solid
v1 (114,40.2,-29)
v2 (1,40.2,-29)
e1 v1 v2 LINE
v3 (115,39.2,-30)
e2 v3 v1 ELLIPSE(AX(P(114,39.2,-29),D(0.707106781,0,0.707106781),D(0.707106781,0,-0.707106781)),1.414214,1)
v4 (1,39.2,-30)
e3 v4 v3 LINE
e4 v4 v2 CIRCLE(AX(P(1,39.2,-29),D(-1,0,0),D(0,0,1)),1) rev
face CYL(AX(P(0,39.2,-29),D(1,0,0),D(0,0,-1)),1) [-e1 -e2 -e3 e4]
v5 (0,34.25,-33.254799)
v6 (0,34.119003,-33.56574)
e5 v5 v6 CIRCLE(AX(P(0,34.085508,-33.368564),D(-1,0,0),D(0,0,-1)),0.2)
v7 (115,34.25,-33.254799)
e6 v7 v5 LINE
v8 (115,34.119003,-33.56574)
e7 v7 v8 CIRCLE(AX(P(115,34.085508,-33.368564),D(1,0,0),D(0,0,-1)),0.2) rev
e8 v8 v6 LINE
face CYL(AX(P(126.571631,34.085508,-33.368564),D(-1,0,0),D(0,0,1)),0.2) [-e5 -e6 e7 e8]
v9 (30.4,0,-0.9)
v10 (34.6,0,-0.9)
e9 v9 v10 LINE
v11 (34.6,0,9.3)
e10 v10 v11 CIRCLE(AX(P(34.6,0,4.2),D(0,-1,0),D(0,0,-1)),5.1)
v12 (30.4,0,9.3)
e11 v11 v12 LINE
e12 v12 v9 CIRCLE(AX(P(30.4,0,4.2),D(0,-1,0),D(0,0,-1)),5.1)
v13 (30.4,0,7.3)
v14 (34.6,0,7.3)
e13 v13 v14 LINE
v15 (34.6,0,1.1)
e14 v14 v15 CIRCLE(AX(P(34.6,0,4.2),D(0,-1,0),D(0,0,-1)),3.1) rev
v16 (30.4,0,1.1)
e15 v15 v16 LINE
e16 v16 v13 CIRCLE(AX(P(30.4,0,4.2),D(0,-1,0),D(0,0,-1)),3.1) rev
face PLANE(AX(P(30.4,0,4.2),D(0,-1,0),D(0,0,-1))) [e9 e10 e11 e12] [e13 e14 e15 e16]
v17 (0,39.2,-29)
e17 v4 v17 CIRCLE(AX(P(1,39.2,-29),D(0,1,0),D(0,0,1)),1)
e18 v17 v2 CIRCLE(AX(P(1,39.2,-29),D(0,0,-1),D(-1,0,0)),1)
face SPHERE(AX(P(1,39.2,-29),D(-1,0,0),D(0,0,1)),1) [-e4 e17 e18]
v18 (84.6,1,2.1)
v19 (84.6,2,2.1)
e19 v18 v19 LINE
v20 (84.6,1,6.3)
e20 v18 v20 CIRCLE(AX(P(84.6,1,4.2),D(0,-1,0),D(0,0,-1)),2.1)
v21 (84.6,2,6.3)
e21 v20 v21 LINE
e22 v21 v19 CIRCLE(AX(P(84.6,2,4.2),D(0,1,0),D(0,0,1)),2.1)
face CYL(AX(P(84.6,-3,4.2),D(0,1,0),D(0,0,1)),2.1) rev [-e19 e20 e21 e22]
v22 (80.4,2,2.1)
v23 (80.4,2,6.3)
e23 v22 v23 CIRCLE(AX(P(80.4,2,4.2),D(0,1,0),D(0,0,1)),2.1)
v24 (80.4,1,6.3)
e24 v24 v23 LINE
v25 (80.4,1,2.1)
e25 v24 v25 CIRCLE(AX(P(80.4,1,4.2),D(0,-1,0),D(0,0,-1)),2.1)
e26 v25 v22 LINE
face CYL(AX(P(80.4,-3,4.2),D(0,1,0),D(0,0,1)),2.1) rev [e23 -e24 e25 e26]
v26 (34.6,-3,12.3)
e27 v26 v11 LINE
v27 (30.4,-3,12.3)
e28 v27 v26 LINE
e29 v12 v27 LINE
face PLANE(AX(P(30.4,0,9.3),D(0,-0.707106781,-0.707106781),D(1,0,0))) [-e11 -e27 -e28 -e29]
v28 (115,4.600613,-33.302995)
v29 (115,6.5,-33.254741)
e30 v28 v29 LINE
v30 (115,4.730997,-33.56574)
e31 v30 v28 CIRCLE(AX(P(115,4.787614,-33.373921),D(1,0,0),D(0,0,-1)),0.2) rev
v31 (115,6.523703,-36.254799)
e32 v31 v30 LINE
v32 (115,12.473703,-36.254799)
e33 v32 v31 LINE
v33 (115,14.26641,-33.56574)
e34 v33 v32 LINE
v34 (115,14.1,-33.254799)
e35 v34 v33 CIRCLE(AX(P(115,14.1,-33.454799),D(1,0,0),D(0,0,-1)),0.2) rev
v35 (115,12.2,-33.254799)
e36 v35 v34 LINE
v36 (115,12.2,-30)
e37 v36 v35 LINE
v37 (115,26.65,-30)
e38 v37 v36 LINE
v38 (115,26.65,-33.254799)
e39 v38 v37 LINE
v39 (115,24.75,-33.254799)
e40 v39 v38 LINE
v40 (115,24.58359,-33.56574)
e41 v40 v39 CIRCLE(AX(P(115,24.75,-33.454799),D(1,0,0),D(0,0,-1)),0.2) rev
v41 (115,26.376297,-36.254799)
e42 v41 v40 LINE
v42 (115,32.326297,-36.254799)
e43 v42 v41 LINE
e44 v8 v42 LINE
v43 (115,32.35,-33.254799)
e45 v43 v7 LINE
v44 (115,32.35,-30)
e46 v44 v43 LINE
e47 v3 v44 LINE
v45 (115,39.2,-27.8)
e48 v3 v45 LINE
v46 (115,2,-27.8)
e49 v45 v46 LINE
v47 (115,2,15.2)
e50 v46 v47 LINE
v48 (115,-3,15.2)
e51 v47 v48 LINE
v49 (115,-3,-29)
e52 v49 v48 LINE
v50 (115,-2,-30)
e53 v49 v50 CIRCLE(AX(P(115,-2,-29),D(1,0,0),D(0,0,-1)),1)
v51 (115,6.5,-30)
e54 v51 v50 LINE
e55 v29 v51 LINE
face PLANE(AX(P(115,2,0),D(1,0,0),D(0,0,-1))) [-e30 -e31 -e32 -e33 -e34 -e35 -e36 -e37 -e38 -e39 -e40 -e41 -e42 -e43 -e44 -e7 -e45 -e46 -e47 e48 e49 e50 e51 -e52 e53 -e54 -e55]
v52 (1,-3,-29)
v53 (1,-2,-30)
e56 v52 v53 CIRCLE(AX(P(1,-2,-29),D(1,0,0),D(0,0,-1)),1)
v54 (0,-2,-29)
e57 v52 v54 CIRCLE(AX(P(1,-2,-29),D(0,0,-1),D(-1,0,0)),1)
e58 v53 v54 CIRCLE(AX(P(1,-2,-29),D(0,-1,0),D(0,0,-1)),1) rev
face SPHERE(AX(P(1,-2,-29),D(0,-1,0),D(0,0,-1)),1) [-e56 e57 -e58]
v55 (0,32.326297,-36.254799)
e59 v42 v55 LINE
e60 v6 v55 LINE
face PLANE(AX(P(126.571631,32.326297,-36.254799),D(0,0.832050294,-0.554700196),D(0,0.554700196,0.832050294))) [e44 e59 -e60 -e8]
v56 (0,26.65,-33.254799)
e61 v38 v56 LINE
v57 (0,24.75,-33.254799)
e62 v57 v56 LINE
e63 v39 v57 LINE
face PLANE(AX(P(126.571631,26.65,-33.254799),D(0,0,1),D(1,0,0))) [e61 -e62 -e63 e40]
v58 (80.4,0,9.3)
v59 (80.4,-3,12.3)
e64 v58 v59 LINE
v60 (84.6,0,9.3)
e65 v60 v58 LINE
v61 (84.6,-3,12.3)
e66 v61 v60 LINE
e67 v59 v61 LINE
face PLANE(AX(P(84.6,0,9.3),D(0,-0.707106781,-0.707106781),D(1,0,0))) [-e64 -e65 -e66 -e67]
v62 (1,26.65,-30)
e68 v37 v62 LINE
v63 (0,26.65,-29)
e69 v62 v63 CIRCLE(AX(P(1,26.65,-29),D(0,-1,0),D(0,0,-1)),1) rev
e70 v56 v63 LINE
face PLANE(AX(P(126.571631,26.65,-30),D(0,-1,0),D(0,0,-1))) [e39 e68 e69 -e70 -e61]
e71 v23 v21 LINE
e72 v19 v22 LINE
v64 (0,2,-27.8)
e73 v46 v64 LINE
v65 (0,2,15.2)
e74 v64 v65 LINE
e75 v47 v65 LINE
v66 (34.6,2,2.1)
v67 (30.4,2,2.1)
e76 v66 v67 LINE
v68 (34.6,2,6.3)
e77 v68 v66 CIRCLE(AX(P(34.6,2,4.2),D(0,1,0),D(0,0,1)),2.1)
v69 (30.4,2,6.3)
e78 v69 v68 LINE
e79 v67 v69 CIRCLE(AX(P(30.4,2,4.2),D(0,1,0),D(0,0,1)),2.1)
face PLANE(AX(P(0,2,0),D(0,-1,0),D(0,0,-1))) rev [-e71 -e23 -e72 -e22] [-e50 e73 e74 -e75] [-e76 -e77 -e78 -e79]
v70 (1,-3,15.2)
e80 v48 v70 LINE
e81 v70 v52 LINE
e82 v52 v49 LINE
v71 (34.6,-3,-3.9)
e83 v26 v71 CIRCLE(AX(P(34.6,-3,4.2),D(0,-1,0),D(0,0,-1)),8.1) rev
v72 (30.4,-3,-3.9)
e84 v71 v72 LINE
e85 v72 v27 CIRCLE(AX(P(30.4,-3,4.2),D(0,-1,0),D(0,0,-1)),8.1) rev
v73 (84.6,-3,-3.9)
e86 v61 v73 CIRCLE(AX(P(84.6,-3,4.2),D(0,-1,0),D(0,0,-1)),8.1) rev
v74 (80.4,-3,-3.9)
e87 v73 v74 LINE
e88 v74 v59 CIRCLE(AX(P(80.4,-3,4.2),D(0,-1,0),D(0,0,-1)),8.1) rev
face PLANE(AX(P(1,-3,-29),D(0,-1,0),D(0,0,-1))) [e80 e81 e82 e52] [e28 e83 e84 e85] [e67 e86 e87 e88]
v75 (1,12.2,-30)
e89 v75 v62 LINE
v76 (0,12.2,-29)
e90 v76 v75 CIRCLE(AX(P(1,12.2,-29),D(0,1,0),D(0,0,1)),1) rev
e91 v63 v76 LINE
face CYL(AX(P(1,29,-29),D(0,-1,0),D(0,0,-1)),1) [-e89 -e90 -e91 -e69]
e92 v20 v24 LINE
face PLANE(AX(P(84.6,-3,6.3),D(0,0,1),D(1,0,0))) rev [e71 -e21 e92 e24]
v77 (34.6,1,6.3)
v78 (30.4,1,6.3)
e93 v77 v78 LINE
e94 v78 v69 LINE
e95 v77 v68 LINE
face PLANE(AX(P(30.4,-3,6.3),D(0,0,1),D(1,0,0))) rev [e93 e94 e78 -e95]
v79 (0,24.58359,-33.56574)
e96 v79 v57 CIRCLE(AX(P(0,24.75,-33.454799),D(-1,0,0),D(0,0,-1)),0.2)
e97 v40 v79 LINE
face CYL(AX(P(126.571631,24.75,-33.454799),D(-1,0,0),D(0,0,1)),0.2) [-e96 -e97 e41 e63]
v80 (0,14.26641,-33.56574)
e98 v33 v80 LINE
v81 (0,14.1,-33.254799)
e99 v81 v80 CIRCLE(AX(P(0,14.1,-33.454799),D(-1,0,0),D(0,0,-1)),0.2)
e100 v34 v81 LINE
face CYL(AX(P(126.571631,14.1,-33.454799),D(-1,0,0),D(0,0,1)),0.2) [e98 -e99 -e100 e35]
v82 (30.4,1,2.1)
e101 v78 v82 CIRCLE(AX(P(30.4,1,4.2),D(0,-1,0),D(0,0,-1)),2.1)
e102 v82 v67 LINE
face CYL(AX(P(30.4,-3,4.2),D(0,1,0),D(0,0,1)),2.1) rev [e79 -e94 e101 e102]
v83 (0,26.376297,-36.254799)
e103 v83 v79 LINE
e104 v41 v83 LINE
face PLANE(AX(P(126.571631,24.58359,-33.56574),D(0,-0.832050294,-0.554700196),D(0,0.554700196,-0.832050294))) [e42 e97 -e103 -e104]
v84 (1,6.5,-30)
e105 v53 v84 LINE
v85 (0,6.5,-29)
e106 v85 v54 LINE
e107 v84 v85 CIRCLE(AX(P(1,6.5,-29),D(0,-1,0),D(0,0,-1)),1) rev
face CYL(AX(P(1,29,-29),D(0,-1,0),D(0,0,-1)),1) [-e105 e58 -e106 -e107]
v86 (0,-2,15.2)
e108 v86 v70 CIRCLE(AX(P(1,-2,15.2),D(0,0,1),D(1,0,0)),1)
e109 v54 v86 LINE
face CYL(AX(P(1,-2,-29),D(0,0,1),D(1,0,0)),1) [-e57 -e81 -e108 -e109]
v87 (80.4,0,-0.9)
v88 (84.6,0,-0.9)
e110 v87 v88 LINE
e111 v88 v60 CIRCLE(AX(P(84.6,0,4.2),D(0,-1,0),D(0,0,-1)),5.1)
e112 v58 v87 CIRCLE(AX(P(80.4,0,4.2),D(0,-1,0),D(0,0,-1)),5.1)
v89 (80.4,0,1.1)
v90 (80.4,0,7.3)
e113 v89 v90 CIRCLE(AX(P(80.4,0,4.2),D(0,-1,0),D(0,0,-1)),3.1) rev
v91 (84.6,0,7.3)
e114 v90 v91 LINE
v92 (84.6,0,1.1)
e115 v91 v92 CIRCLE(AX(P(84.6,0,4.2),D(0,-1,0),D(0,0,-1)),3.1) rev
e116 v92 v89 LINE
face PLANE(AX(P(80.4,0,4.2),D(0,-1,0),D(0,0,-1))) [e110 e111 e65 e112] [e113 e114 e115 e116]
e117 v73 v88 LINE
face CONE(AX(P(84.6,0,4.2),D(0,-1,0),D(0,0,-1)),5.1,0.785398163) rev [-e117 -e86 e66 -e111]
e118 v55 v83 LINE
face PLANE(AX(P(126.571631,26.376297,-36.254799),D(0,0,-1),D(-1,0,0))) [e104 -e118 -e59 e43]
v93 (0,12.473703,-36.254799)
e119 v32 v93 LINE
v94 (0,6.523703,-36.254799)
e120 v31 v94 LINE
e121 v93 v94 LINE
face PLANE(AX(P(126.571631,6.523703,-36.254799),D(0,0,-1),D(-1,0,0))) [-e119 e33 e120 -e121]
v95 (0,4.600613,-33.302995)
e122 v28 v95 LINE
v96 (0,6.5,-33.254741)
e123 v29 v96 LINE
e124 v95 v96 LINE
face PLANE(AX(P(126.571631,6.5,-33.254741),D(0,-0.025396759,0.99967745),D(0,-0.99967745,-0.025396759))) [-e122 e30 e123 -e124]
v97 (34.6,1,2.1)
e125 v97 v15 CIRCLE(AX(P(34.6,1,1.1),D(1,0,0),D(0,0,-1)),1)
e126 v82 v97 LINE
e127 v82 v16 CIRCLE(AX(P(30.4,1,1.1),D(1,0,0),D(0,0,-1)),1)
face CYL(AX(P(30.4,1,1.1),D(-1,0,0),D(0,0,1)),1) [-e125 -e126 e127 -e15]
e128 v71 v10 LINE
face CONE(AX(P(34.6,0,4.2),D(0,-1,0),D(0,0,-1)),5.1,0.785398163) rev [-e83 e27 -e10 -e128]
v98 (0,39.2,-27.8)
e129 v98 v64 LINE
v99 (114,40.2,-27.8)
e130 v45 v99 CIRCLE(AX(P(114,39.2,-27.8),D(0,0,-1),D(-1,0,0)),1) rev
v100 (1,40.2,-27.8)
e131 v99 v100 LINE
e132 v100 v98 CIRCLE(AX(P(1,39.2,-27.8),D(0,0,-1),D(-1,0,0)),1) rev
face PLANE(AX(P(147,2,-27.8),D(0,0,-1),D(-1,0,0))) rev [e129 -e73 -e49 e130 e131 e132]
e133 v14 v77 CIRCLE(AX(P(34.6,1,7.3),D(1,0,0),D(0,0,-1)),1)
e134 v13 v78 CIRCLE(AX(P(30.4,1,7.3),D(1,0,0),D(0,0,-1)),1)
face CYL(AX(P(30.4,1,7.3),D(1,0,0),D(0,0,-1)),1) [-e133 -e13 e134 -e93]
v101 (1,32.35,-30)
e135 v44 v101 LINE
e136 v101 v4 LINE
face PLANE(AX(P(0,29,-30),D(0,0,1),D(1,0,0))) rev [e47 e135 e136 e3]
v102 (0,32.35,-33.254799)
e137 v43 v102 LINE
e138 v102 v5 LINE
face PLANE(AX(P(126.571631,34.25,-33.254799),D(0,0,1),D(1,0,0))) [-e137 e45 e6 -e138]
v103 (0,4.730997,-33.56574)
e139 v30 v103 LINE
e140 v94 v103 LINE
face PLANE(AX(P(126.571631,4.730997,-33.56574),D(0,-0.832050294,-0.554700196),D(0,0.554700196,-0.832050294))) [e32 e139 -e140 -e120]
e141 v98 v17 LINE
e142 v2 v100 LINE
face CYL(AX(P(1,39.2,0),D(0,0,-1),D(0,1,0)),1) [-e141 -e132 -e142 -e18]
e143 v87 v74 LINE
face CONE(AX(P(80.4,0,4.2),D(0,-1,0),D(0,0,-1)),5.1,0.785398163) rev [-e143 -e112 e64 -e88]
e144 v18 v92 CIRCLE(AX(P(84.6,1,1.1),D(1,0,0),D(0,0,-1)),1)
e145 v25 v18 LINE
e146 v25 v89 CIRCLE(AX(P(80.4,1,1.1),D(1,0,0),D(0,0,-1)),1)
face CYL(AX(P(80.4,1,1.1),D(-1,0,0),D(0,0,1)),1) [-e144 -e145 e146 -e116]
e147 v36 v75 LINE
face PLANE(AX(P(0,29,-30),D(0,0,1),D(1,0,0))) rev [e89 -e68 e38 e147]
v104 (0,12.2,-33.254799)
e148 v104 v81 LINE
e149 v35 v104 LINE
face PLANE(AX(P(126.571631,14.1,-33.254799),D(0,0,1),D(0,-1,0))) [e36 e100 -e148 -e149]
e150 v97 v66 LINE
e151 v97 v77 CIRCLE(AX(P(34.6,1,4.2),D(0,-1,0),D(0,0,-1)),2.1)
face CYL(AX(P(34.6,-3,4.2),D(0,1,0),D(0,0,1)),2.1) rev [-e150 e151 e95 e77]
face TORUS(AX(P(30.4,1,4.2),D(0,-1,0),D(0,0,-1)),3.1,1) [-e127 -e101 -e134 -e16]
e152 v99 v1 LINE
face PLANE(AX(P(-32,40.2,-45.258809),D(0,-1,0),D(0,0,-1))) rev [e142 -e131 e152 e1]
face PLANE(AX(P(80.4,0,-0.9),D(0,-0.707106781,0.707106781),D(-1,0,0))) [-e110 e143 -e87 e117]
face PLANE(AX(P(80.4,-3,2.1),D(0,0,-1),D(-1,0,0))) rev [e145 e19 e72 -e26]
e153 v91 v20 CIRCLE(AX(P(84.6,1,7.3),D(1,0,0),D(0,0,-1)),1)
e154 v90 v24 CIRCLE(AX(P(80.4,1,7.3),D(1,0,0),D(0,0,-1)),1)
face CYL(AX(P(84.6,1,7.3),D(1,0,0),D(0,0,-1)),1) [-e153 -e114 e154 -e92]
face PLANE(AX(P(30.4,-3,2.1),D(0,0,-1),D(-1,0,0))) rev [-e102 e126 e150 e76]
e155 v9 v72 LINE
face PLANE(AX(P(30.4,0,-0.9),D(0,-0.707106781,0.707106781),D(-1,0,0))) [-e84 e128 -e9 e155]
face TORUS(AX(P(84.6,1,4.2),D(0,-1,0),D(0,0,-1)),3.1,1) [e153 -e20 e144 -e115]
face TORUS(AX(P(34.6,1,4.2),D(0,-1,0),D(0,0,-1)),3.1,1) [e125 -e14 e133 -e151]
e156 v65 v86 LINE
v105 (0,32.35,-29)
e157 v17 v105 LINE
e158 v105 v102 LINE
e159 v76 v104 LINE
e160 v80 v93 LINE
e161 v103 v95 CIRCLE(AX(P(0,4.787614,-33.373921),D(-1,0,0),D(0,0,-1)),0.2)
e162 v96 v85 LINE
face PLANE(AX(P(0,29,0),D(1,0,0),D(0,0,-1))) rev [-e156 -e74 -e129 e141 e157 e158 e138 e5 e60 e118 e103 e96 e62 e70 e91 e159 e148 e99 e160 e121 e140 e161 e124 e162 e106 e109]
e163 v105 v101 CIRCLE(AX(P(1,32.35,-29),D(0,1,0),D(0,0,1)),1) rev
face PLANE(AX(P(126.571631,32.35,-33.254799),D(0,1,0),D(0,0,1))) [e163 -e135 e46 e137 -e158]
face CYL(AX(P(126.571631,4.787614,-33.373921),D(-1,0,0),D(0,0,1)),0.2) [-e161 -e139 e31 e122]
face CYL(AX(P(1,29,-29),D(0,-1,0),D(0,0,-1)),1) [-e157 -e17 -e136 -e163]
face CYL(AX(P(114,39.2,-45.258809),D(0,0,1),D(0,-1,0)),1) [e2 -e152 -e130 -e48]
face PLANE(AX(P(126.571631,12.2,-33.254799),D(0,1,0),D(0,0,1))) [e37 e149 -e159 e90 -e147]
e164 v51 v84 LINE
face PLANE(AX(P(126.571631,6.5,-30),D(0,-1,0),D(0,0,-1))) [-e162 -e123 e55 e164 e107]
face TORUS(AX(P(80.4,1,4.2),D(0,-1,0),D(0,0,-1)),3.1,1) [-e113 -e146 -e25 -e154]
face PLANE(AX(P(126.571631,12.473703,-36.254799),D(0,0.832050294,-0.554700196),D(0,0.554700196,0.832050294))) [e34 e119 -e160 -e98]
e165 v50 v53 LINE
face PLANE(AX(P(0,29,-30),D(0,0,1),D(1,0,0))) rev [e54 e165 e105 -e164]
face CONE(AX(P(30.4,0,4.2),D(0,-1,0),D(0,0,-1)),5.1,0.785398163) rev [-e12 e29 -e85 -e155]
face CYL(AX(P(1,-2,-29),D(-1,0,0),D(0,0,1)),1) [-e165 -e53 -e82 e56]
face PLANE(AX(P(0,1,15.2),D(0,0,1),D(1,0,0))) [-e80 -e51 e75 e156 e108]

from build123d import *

# Parameters (mm, degrees)
SKETCH_1_W               = 115
SKETCH_1_H               = 30
EXTRUDE_1_DEPTH          = 29
SHELL_1_T                = -2
SKETCH_4_W               = 55
SKETCH_4_H               = 63
EXTRUDE_2_DEPTH          = 2
SKETCH_7_W               = 28
SKETCH_7_H               = 49
CUT_EXTRUDE_2_DEPTH      = 28
EXTRUDE_6_DEPTH          = 29
EXTRUDE_8_DEPTH          = 2
EXTRUDE_9_DEPTH          = 115
FILLET_1_R               = 1
SKETCH_8_R               = 1.2
CUT_EXTRUDE_5_DEPTH      = 10
SKETCH_15_W              = 113
SKETCH_15_H              = 39.979543783
CUT_EXTRUDE_6_DEPTH      = 33
CUT_EXTRUDE_7_REACH      = 152.193
SKETCH_16_W              = 16.4
SKETCH_16_H              = 9.3
SKETCH_17_W              = 40.5
SKETCH_17_H              = 2
EXTRUDE_10_DEPTH         = 113
CUT_EXTRUDE_8_DEPTH      = 147
CUT_EXTRUDE_9_DEPTH      = 147
CUT_EXTRUDE_9_DEPTH_BACK = 147
SKETCH_21_W              = 20.17617045
SKETCH_21_H              = 57.30071962
SKETCH_22_W              = 2
SKETCH_22_H              = 5
CUT_EXTRUDE_11_DEPTH     = 0.2
SKETCH_24_W              = 113
SKETCH_24_H              = 56
EXTRUDE_16_DEPTH         = 0.2
CUT_EXTRUDE_12_DEPTH     = 147
CUT_EXTRUDE_13_DEPTH     = 5
FILLET_8_R               = 1
EXTRUDE_17_DEPTH         = 3
EXTRUDE_17_DEPTH_BACK    = 1
FILLET_10_R              = 1
SKETCH_28_W              = 115
SKETCH_28_H              = 5
EXTRUDE_18_DEPTH         = 1
CUT_EXTRUDE_START        = -3
CUT_EXTRUDE_14_DEPTH     = 3
CHAMFER_7_SIZE           = 3
FILLET_11_R              = 1


with BuildPart() as part:
    # Эскиз1 → Бобышка-Вытянуть1 (new body)
    with BuildSketch(Plane(origin=(0, 0, 0), x_dir=(1, 0, 0), z_dir=(0, 1, 0))):
        with Locations((57.5, 15)):
            Rectangle(SKETCH_1_W, SKETCH_1_H)
    extrude(amount=EXTRUDE_1_DEPTH)

    # Оболочка1
    shell_1_openings = [part.faces().sort_by_distance(p)[0] for p in [
        (57.5, 14.5, 0),
    ]]
    offset(amount=SHELL_1_T, openings=shell_1_openings, kind=Kind.INTERSECTION)

    # Эскиз4 → Бобышка-Вытянуть2 (add)
    with BuildSketch(Plane(origin=(115, 0, 0), x_dir=(0, 0, -1), z_dir=(1, 0, 0))):
        with Locations((15, 31.5)):
            Rectangle(SKETCH_4_W, SKETCH_4_H)
    extrude(amount=EXTRUDE_2_DEPTH)

    # Эскиз7 → Вырез-Вытянуть2 (cut)
    with BuildSketch(Plane(origin=(117, 0, 0), x_dir=(0, 0, -1), z_dir=(1, 0, 0))):
        with Locations((14, 31.5)):
            Rectangle(SKETCH_7_W, SKETCH_7_H)
    extrude(amount=-CUT_EXTRUDE_2_DEPTH, mode=Mode.SUBTRACT)

    # Эскиз10 → Бобышка-Вытянуть6 (add)
    with BuildSketch(Plane(origin=(0, 29, 0), x_dir=(1, 0, 0), z_dir=(0, 1, 0))):
        Polygon((115, 30), (115, 28), (89, 28), (2, 28), (2, 0), (0, 0), (0, 28), (0, 30), (87, 30), align=None)
    extrude(amount=EXTRUDE_6_DEPTH)

    # Эскиз13 → Бобышка-Вытянуть8 (add)
    with BuildSketch(Plane.XZ):
        Polygon((115, 12.5), (115, 40), (0, 40), (0, 0), (115, 0), align=None)
        with BuildLine():
            ThreePointArc((34.6, 31.75), (36.7, 33.85), (34.6, 35.95))
            Line((34.6, 35.95), (30.4, 35.95))
            ThreePointArc((30.4, 35.95), (28.3, 33.85), (30.4, 31.75))
            Line((30.4, 31.75), (34.6, 31.75))
        make_face(mode=Mode.SUBTRACT)
        with BuildLine():
            ThreePointArc((80.4, 35.95), (78.3, 33.85), (80.4, 31.75))
            Line((80.4, 31.75), (84.6, 31.75))
            ThreePointArc((84.6, 31.75), (86.7, 33.85), (84.6, 35.95))
            Line((84.6, 35.95), (80.4, 35.95))
        make_face(mode=Mode.SUBTRACT)
    extrude(amount=-EXTRUDE_8_DEPTH)

    # Эскиз14 → Бобышка-Вытянуть9 (add)
    with BuildSketch(Plane.ZY):
        with BuildLine():
            Line((-33.254799468, 26.65), (-33.254799468, 24.75))
            ThreePointArc((-33.254799468, 24.75), (-33.360427883, 24.57366508), (-33.565739508, 24.583589941))
            Line((-33.565739508, 24.583589941), (-36.254799468, 26.376296582))
            Line((-36.254799468, 26.376296582), (-36.254799468, 32.326296582))
            Line((-36.254799468, 32.326296582), (-33.565739508, 34.119003222))
            ThreePointArc((-33.565739508, 34.119003222), (-33.446213245, 34.269819382), (-33.254799468, 34.25))
            Line((-33.254799468, 34.25), (-33.254799468, 32.35))
            Line((-33.254799468, 32.35), (-30, 32.35))
            Line((-30, 32.35), (-30, 26.65))
            Line((-30, 26.65), (-33.254799468, 26.65))
        make_face()
        with BuildLine():
            Line((-33.254741117, 6.5), (-33.302994959, 4.600612844))
            ThreePointArc((-33.302994959, 4.600612844), (-33.462823881, 4.6084601), (-33.565739508, 4.730996778))
            Line((-33.565739508, 4.730996778), (-36.254799468, 6.523703418))
            Line((-36.254799468, 6.523703418), (-36.254799468, 12.473703418))
            Line((-36.254799468, 12.473703418), (-33.565739508, 14.266410059))
            ThreePointArc((-33.565739508, 14.266410059), (-33.360427883, 14.27633492), (-33.254799468, 14.1))
            Line((-33.254799468, 14.1), (-33.254799468, 12.2))
            Line((-33.254799468, 12.2), (-30, 12.2))
            Line((-30, 12.2), (-30, 6.5))
            Line((-30, 6.5), (-33.254741117, 6.5))
        make_face()
    extrude(amount=-EXTRUDE_9_DEPTH)

    # Скругление1
    fillet_1_edges = [part.edges().sort_by_distance(p)[0] for p in [
        (32.5, 0, 35.95),
        (82.5, 0, 35.95),
        (82.5, 0, 31.75),
        (78.3, 0, 33.85),
        (86.7, 0, 33.85),
        (36.7, 0, 33.85),
        (28.3, 0, 33.85),
        (32.5, 0, 31.75),
    ]]
    fillet(fillet_1_edges, radius=FILLET_1_R)

    # Эскиз8 → Вырез-Вытянуть5 (cut)
    with BuildSketch(Plane(origin=(117, 0, 0), x_dir=(0, 0, -1), z_dir=(1, 0, 0))):
        with Locations((-5.5, 31.5)):
            Circle(SKETCH_8_R)
    extrude(amount=-CUT_EXTRUDE_5_DEPTH, mode=Mode.SUBTRACT)

    # Эскиз15 → Вырез-Вытянуть6 (cut)
    with BuildSketch(Plane.XY.offset(-28)):
        with Locations((58.5, 46.989771892)):
            Rectangle(SKETCH_15_W, SKETCH_15_H)
    extrude(amount=CUT_EXTRUDE_6_DEPTH, mode=Mode.SUBTRACT)

    # Эскиз16 → Вырез-Вытянуть7 (cut, up to next)
    with BuildSketch(Plane(origin=(0, 0, -30), x_dir=(-1, 0, 0), z_dir=(0, 0, -1)), mode=Mode.PRIVATE) as cut_extrude_7_sk1:
        with Locations((-53.2, 49.65)):
            Rectangle(SKETCH_16_W, SKETCH_16_H)
    cut_extrude_7_tool1 = extrude(cut_extrude_7_sk1.sketch, amount=-CUT_EXTRUDE_7_REACH, mode=Mode.PRIVATE) & part.part
    add(cut_extrude_7_tool1.solids().sort_by_distance((53.2, 49.65, -30))[0], mode=Mode.SUBTRACT)

    # Эскиз17 → Бобышка-Вытянуть10 (add)
    with BuildSketch(Plane.ZY.offset(-115)):
        with Locations((-7.75, 57)):
            Rectangle(SKETCH_17_W, SKETCH_17_H)
    extrude(amount=EXTRUDE_10_DEPTH)

    # Эскиз20 → Вырез-Вытянуть8 (cut)
    with BuildSketch(Plane.ZY):
        Polygon((0, 2), (-27.8, 2), (-27.8, 71.965307459), (29.159484087, 71.965307459), (29.159484087, 2), align=None)
    extrude(amount=-CUT_EXTRUDE_8_DEPTH, mode=Mode.SUBTRACT)

    # Эскиз21 → Вырез-Вытянуть9 (cut, two sides: drawn at the far end of the back side and taken through both)
    with BuildSketch(Plane(origin=(0, 2, 0), x_dir=(1, 0, 0), z_dir=(0, 1, 0)).offset(-CUT_EXTRUDE_9_DEPTH_BACK)):
        with Locations((125.088085225, 16.15035981)):
            Rectangle(SKETCH_21_W, SKETCH_21_H)
    extrude(amount=CUT_EXTRUDE_9_DEPTH + CUT_EXTRUDE_9_DEPTH_BACK, mode=Mode.SUBTRACT)

    # Эскиз22 → Вырез-Вытянуть11 (cut)
    with BuildSketch(Plane.XY.offset(-28)):
        with Locations((114, 4.5)):
            Rectangle(SKETCH_22_W, SKETCH_22_H)
    extrude(amount=CUT_EXTRUDE_11_DEPTH, mode=Mode.SUBTRACT)

    # Эскиз24 → Бобышка-Вытянуть16 (add)
    with BuildSketch(Plane.XY.offset(-27.8)):
        with Locations((58.5, 28)):
            Rectangle(SKETCH_24_W, SKETCH_24_H)
    extrude(amount=-EXTRUDE_16_DEPTH)

    # Эскиз25 → Вырез-Вытянуть12 (cut)
    with BuildSketch(Plane(origin=(115, 0, 0), x_dir=(0, 0, -1), z_dir=(1, 0, 0))):
        Polygon((-61.35646419, 61.721146041), (45.258808631, 61.721146041), (45.258808631, 40.2), (-10.2, 40.2), (-10.2, -7.989940419), (-61.35646419, -7.989940419), (-61.35646419, 40.2), align=None)
    extrude(amount=-CUT_EXTRUDE_12_DEPTH, mode=Mode.SUBTRACT)

    # Эскиз26 → Вырез-Вытянуть13 (cut)
    with BuildSketch(Plane(origin=(0, 2, 0), x_dir=(1, 0, 0), z_dir=(0, 1, 0))):
        with BuildLine():
            Line((30.4, -2.1), (34.6, -2.1))
            ThreePointArc((34.6, -2.1), (36.7, -4.2), (34.6, -6.3))
            Line((34.6, -6.3), (30.4, -6.3))
            ThreePointArc((30.4, -6.3), (28.3, -4.2), (30.4, -2.1))
        make_face()
        with BuildLine():
            Line((80.4, -2.1), (84.6, -2.1))
            ThreePointArc((84.6, -2.1), (86.7, -4.2), (84.6, -6.3))
            Line((84.6, -6.3), (80.4, -6.3))
            ThreePointArc((80.4, -6.3), (78.3, -4.2), (80.4, -2.1))
        make_face()
    extrude(amount=-CUT_EXTRUDE_13_DEPTH, mode=Mode.SUBTRACT)

    # Скругление8
    fillet_8_edges = [part.edges().sort_by_distance(p)[0] for p in [
        (0, 3.25, -30),
        (0, 19.425, -30),
        (0, 36.275, -30),
        (0, 40.2, -28.9),
        (57.5, 40.2, -30),
        (115, 40.2, -28.9),
        (57.5, 0, 10.2),
        (57.5, 0, -30),
        (0, 0, -9.9),
    ]]
    fillet(fillet_8_edges, radius=FILLET_8_R)

    # Эскиз27 → Бобышка-Вытянуть17 (add, two sides: drawn at the far end of the back side and taken through both)
    with BuildSketch(Plane.XZ.offset(-EXTRUDE_17_DEPTH_BACK)):
        with BuildLine():
            Line((115, -30), (115, -29))
            Line((115, -29), (115, 9.2))
            Line((115, 9.2), (115, 10.2))
            Line((115, 10.2), (115, 15.2))
            Line((115, 15.2), (0, 15.2))
            Line((0, 15.2), (0, 10.2))
            Line((0, 10.2), (0, -29))
            ThreePointArc((0, -29), (0.292893219, -29.707106781), (1, -30))
            Line((1, -30), (115, -30))
        make_face()
        with BuildLine():
            Line((84.6, 6.3), (80.4, 6.3))
            ThreePointArc((80.4, 6.3), (78.3, 4.2), (80.4, 2.1))
            Line((80.4, 2.1), (84.6, 2.1))
            ThreePointArc((84.6, 2.1), (86.7, 4.2), (84.6, 6.3))
        make_face(mode=Mode.SUBTRACT)
        with BuildLine():
            Line((30.4, 2.1), (34.6, 2.1))
            ThreePointArc((34.6, 2.1), (36.7, 4.2), (34.6, 6.3))
            Line((34.6, 6.3), (30.4, 6.3))
            ThreePointArc((30.4, 6.3), (28.3, 4.2), (30.4, 2.1))
        make_face(mode=Mode.SUBTRACT)
    extrude(amount=EXTRUDE_17_DEPTH + EXTRUDE_17_DEPTH_BACK)

    # Скругление10
    fillet_10_edges = [part.edges().sort_by_distance(p)[0] for p in [
        (58, -3, -30),
        (0, -3, -6.9),
        (0.292893219, -3, -29.707106781),
    ]]
    fillet(fillet_10_edges, radius=FILLET_10_R)

    # Эскиз28 → Бобышка-Вытянуть18 (add)
    with BuildSketch(Plane(origin=(0, 1, 0), x_dir=(1, 0, 0), z_dir=(0, 1, 0))):
        with Locations((57.5, -12.7)):
            Rectangle(SKETCH_28_W, SKETCH_28_H)
    extrude(amount=EXTRUDE_18_DEPTH)

    # Эскиз29 → Вырез-Вытянуть14 (cut)
    # profile 1 of 2: a face of its own
    with BuildSketch(Plane.XZ.offset(3).offset(CUT_EXTRUDE_START)):
        with BuildLine():
            Line((30.4, 9.3), (34.6, 9.3))
            ThreePointArc((34.6, 9.3), (39.7, 4.2), (34.6, -0.9))
            Line((34.6, -0.9), (30.4, -0.9))
            ThreePointArc((30.4, -0.9), (25.3, 4.2), (30.4, 9.3))
        make_face()
        with BuildLine():
            Line((30.4, 2.1), (34.6, 2.1))
            ThreePointArc((34.6, 2.1), (36.7, 4.2), (34.6, 6.3))
            Line((34.6, 6.3), (30.4, 6.3))
            ThreePointArc((30.4, 6.3), (28.3, 4.2), (30.4, 2.1))
        make_face(mode=Mode.SUBTRACT)
    # profile 2 of 2: a face of its own
    with BuildSketch(Plane.XZ.offset(3).offset(CUT_EXTRUDE_START)):
        with BuildLine():
            Line((80.4, -0.9), (84.6, -0.9))
            ThreePointArc((84.6, -0.9), (89.7, 4.2), (84.6, 9.3))
            Line((84.6, 9.3), (80.4, 9.3))
            ThreePointArc((80.4, 9.3), (75.3, 4.2), (80.4, -0.9))
        make_face()
        with BuildLine():
            Line((80.4, 2.1), (84.6, 2.1))
            ThreePointArc((84.6, 2.1), (86.7, 4.2), (84.6, 6.3))
            Line((84.6, 6.3), (80.4, 6.3))
            ThreePointArc((80.4, 6.3), (78.3, 4.2), (80.4, 2.1))
        make_face(mode=Mode.SUBTRACT)
    extrude(amount=CUT_EXTRUDE_14_DEPTH, mode=Mode.SUBTRACT)

    # Фаска7
    chamfer_7_edges = [part.edges().sort_by_distance(p)[0] for p in [
        (82.5, -3, -0.9),
        (89.7, -3, 4.2),
        (75.3, -3, 4.2),
        (82.5, -3, 9.3),
        (32.5, -3, -0.9),
        (39.7, -3, 4.2),
        (25.3, -3, 4.2),
        (32.5, -3, 9.3),
    ]]
    chamfer(chamfer_7_edges, length=CHAMFER_7_SIZE - 0.0001)  # a hair under: the kernel refuses the full size

    # Скругление11
    fillet_11_edges = [part.edges().sort_by_distance(p)[0] for p in [
        (32.5, 0, 6.3),
        (28.3, 0, 4.2),
        (32.5, 0, 2.1),
        (36.7, 0, 4.2),
        (82.5, 0, 6.3),
        (78.3, 0, 4.2),
        (82.5, 0, 2.1),
        (86.7, 0, 4.2),
    ]]
    fillet(fillet_11_edges, radius=FILLET_11_R)


solid = part.part
